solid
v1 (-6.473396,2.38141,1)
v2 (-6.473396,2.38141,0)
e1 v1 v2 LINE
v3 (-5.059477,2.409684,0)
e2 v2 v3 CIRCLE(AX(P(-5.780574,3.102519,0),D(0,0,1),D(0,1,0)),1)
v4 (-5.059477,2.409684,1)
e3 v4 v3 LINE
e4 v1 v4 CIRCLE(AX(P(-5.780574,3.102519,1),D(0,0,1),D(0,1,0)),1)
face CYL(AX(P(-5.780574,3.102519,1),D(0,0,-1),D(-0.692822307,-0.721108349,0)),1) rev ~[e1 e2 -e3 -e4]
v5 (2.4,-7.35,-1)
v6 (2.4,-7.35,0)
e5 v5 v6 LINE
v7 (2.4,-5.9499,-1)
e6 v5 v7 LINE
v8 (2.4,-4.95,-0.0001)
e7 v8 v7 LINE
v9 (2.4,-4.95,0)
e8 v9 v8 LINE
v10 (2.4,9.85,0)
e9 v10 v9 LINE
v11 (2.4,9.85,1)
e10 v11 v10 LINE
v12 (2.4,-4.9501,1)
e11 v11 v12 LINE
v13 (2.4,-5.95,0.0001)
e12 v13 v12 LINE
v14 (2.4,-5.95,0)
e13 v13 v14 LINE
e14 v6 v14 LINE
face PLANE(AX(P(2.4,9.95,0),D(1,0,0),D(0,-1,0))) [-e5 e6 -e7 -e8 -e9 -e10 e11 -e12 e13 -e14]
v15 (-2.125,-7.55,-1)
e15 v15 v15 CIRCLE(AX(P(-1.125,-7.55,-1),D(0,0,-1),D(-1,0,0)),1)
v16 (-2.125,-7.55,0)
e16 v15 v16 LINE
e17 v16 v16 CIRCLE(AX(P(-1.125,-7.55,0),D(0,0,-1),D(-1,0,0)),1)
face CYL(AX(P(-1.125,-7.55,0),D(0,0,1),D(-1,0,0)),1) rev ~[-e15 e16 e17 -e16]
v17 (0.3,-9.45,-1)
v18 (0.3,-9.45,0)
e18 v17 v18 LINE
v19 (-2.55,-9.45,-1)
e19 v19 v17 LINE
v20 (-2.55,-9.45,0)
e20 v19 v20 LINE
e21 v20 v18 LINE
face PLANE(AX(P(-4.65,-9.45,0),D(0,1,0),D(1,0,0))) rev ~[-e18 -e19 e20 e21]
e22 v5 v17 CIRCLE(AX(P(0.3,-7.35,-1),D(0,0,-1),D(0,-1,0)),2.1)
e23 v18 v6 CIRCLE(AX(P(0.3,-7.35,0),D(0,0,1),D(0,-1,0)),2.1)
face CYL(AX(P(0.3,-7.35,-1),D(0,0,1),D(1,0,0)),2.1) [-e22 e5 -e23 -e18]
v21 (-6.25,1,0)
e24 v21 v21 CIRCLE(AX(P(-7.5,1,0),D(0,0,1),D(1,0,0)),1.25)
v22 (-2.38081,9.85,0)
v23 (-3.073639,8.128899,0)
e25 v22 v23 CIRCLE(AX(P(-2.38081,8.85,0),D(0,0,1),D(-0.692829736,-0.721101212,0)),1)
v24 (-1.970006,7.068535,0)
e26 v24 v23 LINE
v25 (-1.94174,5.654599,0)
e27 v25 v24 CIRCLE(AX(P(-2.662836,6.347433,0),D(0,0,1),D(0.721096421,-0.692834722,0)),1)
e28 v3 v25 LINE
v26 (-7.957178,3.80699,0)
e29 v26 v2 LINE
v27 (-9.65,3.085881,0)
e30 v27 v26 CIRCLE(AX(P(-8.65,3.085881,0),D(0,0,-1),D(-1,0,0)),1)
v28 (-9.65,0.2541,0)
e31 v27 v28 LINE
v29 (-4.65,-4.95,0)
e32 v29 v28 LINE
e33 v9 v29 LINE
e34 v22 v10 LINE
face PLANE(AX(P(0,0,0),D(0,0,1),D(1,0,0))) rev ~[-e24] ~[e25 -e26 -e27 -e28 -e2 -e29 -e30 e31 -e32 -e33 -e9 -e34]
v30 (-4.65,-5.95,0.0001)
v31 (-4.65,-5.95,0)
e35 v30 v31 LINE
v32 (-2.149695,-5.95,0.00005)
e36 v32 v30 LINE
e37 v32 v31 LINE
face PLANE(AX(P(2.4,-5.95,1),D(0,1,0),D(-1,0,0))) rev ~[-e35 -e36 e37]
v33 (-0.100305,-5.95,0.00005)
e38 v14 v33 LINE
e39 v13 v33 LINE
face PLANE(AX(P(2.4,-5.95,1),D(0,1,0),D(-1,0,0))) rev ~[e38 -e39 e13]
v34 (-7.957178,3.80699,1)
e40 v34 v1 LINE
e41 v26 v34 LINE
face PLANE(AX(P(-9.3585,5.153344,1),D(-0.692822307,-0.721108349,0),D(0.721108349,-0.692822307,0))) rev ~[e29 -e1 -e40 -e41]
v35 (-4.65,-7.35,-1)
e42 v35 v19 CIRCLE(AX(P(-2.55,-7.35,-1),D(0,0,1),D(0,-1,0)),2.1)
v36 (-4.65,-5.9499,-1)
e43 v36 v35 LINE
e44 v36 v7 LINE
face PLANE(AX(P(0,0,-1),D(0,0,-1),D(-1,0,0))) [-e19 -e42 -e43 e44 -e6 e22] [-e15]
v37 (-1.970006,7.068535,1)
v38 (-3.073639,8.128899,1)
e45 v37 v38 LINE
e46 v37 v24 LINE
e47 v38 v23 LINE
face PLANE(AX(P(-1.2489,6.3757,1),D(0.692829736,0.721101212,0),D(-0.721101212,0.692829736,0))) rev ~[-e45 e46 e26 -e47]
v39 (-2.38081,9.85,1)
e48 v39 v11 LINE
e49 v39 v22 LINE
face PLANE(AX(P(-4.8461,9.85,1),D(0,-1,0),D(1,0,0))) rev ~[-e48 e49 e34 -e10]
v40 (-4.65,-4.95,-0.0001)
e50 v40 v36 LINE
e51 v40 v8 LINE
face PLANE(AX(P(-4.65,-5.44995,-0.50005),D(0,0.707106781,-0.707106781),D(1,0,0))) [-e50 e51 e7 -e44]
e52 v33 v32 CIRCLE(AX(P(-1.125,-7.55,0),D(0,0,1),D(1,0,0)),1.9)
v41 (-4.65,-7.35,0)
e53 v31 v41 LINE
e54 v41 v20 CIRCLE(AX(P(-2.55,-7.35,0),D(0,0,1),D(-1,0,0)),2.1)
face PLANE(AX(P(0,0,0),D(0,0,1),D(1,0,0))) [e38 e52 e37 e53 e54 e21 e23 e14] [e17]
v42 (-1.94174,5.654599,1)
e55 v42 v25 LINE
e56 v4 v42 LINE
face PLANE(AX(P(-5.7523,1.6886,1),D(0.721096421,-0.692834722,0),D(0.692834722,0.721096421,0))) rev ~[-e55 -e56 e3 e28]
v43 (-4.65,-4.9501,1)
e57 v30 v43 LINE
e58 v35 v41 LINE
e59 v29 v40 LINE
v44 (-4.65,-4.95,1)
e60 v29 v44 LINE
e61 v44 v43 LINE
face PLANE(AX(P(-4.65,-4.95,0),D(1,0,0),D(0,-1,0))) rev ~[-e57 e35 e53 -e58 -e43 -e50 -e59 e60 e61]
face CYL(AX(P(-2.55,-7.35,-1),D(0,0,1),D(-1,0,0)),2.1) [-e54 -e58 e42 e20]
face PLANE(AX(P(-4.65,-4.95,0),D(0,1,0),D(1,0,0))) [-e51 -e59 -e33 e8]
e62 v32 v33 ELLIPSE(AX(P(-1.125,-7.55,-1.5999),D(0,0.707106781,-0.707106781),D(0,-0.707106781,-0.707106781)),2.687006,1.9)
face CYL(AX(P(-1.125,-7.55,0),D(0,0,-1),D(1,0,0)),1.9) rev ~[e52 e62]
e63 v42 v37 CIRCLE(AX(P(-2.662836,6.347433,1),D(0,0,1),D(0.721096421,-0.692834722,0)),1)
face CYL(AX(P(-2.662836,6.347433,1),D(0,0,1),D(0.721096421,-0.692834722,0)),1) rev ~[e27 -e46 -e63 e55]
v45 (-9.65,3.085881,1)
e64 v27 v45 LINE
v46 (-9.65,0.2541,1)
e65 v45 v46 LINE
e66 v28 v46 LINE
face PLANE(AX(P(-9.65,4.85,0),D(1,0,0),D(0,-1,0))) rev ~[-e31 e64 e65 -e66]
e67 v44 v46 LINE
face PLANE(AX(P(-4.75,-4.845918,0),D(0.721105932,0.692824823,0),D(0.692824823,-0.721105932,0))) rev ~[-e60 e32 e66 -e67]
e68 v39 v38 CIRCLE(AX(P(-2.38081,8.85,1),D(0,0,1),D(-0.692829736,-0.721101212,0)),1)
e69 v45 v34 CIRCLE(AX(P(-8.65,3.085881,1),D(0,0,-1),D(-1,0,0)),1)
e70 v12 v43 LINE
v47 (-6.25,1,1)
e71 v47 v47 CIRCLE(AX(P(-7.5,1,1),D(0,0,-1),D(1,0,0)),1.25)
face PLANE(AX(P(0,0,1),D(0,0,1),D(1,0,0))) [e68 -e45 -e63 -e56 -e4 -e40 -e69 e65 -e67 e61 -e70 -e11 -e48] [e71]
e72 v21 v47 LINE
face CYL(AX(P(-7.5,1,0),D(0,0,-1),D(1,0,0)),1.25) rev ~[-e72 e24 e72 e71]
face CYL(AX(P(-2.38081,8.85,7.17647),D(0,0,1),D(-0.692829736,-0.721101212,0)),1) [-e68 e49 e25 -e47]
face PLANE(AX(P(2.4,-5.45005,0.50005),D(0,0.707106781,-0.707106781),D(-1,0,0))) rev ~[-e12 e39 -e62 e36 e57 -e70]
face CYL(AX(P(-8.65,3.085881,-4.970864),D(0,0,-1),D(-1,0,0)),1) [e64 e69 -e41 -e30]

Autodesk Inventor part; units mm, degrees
ref_plane "YZ Plane" through (0, 0, 0) normal (1, 0, 0) x (0, 1, 0)
ref_plane "XZ Plane" through (0, 0, 0) normal (0, 1, 0) x (-1, 0, 0)
ref_plane "XY Plane" through (0, 0, 0) normal (0, 0, 1) x (1, 0, 0)
sketch "Sketch1" plane through (0, 0, 0) normal (0, 0, 1) x (1, 0, 0)
  circle A0 centre (0, 0) radius 1.25
  line L0 (-4.75, 9.95) -> (2.5, 9.95)
  line L1 (2.5, 9.95) -> (2.5, -4.95)
  line L2 (2.5, -4.95) -> (-4.75, -4.95)
  line L3 (-4.75, -4.95) -> (-4.75, 9.95)
  line L4 (-4.75, 4.85) -> (-9.65, 4.85)
  line L5 (-9.65, 4.85) -> (-9.65, 0.15)
  line L6 (-9.65, 0.15) -> (-4.75, 0.15)
  line L7 (-4.75, 0.15) -> (-4.75, 4.85)
  line L8 (-4.75, -4.95) -> (-9.65, 0.15)
  line L9 (-9.65, 4.85) -> (-4.75, 9.95)
  line L10 (-9.65, 4.85) -> (-13.2555, 8.3141)
  line L11 (-4.75, 9.95) -> (-8.2862, 13.4862)
  line L12 (-13.2555, 8.3141) -> (-8.2862, 13.4862)
  circle A1 centre (-7.5, 1) radius 1.25
  line L13 (-9.5461, 4.9582) -> (-13.1516, 8.4223)
  line L14 (-4.8539, 9.8418) -> (-8.3902, 13.3781)
  line L15 (2.4, 9.95) -> (2.4, -4.95)
  line L16 (-9.65, 0.2541) -> (-4.65, -4.95)
  point P0 (-8.4165, 0.15)
  point P1 (-6.5835, 0.15)
  point P2 (-9.55, 0.15)
  point P3 (-4.75, -4.8459)
  dimension "d26" = 4.95
  dimension "d27" = 7.25
  dimension "d28" = 2.5
  dimension "d29" = 4.9
  dimension "d30" = 14.9
  dimension "d31" = 5.1
  dimension "d32" = 5.1
  dimension "d33" = 90
  dimension "d34" = 135
  dimension "d36" = 0
  dimension "d37" = 0
  dimension "d38" = 2.5
  dimension "d39" = 5
  dimension "d40" = 2.5
  dimension "d41" = 1
  dimension "d42" = 7.5
  dimension "d43" = 0.15
  dimension "d44" = 0.15
  dimension "d54" = 0.1
  dimension "d55" = 0.1
extrude "Extrusion1" add sketch "Sketch1" along normal blind 1 contours A0 | L0 L15 L2 L16 L3 | L3 L4 L9 | L3 L6 A1 L16 L5 L4 | L3 L16 L6 A1
sketch "Sketch7" plane through (0, 0, 0) normal (0, 0, -1) x (-1, 0, 0)
  line L0 (4.65, -4.95) -> (-2.4, -4.95) projected
  line L1 (9.65, 0.2541) -> (4.65, -4.95) projected
  line L2 (9.65, 4.85) -> (9.65, 0.2541) projected
  line L3 (4.75, 9.95) -> (9.65, 4.85) projected
  line L4 (-2.4, 9.95) -> (4.75, 9.95) projected
  line L5 (-2.4, -4.95) -> (-2.4, 9.95) projected
  circle A0 centre (7.5, 1) radius 1.25 projected
  line L6 (4.65, -4.95) -> (-2.4, -4.95) projected
  line L7 (-2.4, -4.95) -> (4.65, -4.95)
  line L8 (4.65, -4.95) -> (4.65, -9.45)
  line L9 (4.65, -9.45) -> (-2.4, -9.45)
  line L10 (-2.4, -9.45) -> (-2.4, -4.95)
  circle A1 centre (1.125, -7.55) radius 1
  line L11 (4.75, 9.95) -> (8.2855, 13.4855)
  line L12 (4.75, 9.95) -> (9.75, 9.95) construction
  line L13 (9.65, 4.85) -> (13.1855, 8.3855)
  line L14 (9.65, 4.85) -> (14.65, 4.85) construction
  line L15 (13.1855, 8.3855) -> (8.2855, 13.4855)
  line L16 (9.5114, 4.9942) -> (13.0469, 8.5298)
  line L17 (-2.4, -4.95) -> (-2.4, 9.95) projected
  line L18 (-2.4, 9.85) -> (4.8461, 9.85)
  line L19 (4.8461, 9.85) -> (8.3816, 13.3855)
  point P0 (0, 0)
  dimension "d56" = 0
  dimension "d57" = 4.5
  dimension "d58" = 2
  dimension "d59" = 3.525
  dimension "d60" = 2.6
  dimension "d63" = 5
  dimension "d64" = 45
  dimension "d65" = 5
  dimension "d66" = 45
  dimension "d68" = 0.2
  dimension "d69" = 0.1
extrude "Extrusion5" add sketch "Sketch7" against normal mid plane 2 contours L8 L9 L10 L0 | L19 L15 L16 L3
fillet "Fillet2" radius 2.1 2 edges at (-4.65, -9.45, 0) (2.4, -9.45, 0)
sketch "Sketch8" plane through (0, 0, 1) normal (0, 0, 1) x (1, 0, 0)
  line L0 (2.4, 9.95) -> (-4.75, 9.95) projected
  line L1 (-4.75, 9.95) -> (-4.8461, 9.85) projected
  line L2 (2.4, -7.35) -> (2.4, 9.95) projected
  line L3 (-4.75, 9.95) -> (-4.8461, 9.85) projected
  line L4 (-4.8461, 9.85) -> (2.4, 9.85)
  point P0 (0, 0)
extrude "Extrusion6" cut sketch "Sketch8" against normal up to surface (1 mm away)
chamfer "Chamfer1" distance 1 angle 45 2 edges at (-1.125, -4.95, -1) (-7.1787, 7.4221, -1)
sketch "Sketch9" plane through (0, 0, 1) normal (0, 0, 1) x (1, 0, 0)
  line L0 (-4.65, -4.95) -> (2.4, -4.95) projected
  line L1 (2.4, -5.95) -> (-4.65, -5.95) projected
  line L2 (2.4, 9.85) -> (-4.8461, 9.85) projected
  line L3 (-4.8461, 9.85) -> (-8.3816, 13.3855) projected
  line L4 (-8.3816, 13.3855) -> (-13.0469, 8.5298) projected
  line L5 (-13.0469, 8.5298) -> (-9.5114, 4.9942) projected
  line L6 (-9.5114, 4.9942) -> (-9.65, 4.85) projected
  line L7 (-9.65, 4.85) -> (-9.65, 0.2541) projected
  line L8 (-9.65, 0.2541) -> (-4.65, -4.95) projected
  line L9 (-4.65, -4.95) -> (-4.65, -7.35) projected
  arc A0 (-4.65, -7.35) -> (-2.55, -9.45) centre (-2.55, -7.35) ccw projected
  line L10 (-2.55, -9.45) -> (0.3, -9.45) projected
  arc A1 (0.3, -9.45) -> (2.4, -7.35) centre (0.3, -7.35) ccw projected
  line L11 (2.4, -7.35) -> (2.4, 9.85) projected
  circle A2 centre (-1.125, -7.55) radius 1 projected
  circle A3 centre (-7.5, 1) radius 1.25 projected
  point P0 (0, 0)
extrude "Extrusion7" cut sketch "Sketch9" against normal blind 1 contours L1 L11 A1 L10 A0 L9
chamfer "Chamfer2" distance 1 angle 45 1 edges at (-1.125, -5.95, 1)
sketch "Sketch10" plane through (0, 0, 0) normal (0, 0, 1) x (1, 0, 0)
  circle A0 centre (-1.125, -7.55) radius 1 projected
  circle A1 centre (-1.125, -7.55) radius 1.9
  point P0 (0, 0)
  dimension "d80" = 3.8
extrude "Extrusion8" cut sketch "Sketch10" along normal up to surface (1 mm away)
sketch "Sketch11" plane through (0, 0, 1) normal (0, 0, 1) x (1, 0, 0)
  line L0 (-6.2966, 11.2255) -> (-10.8, 6.5383)
  line L1 (-10.8, 6.5383) -> (-5.7523, 1.6886)
  line L2 (-5.7523, 1.6886) -> (-1.2489, 6.3757)
  line L3 (-1.2489, 6.3757) -> (-6.2966, 11.2255)
  line L4 (-6.2966, 11.2255) -> (-5.7523, 1.6886) construction
  line L5 (-10.8, 6.5383) -> (-1.2489, 6.3757) construction
  line L6 (-8.3816, 13.3855) -> (-13.0469, 8.5298) projected
  line L7 (-13.0469, 8.5298) -> (-9.5114, 4.9942) projected
  line L8 (-4.8461, 9.85) -> (-8.3816, 13.3855) projected
  line L9 (-4.8461, 9.85) -> (2.4, 9.85) projected
  line L10 (-4.8461, 9.85) -> (-4.8551, 9.8406)
  line L11 (-4.8461, 9.85) -> (-9.5114, 4.9942) projected
  point P0 (0, 0)
  point P1 (-6.0245, 6.457)
  point P2 (-10.9252, 6.408)
  point P3 (-6.2599, 11.2638)
  point P4 (-9.3585, 5.1534)
  dimension "d83" = 7
  dimension "d85" = 6.5
  dimension "d86" = 3.5
  dimension "d89" = 6.5
extrude "Extrusion9" cut sketch "Sketch11" against normal up to surface (2 mm away)
fillet "Fillet3" radius 1 1 edges at (-5.7523, 1.6886, 0.5)
fillet "Fillet4" radius 1 5 edges at (-9.3585, 5.1534, 0.5) (-9.65, 4.85, 0.5) (-1.2489, 6.3757, 0.5) (-4.8551, 9.8406, 0.5) (-4.8461, 9.85, 0.5)
